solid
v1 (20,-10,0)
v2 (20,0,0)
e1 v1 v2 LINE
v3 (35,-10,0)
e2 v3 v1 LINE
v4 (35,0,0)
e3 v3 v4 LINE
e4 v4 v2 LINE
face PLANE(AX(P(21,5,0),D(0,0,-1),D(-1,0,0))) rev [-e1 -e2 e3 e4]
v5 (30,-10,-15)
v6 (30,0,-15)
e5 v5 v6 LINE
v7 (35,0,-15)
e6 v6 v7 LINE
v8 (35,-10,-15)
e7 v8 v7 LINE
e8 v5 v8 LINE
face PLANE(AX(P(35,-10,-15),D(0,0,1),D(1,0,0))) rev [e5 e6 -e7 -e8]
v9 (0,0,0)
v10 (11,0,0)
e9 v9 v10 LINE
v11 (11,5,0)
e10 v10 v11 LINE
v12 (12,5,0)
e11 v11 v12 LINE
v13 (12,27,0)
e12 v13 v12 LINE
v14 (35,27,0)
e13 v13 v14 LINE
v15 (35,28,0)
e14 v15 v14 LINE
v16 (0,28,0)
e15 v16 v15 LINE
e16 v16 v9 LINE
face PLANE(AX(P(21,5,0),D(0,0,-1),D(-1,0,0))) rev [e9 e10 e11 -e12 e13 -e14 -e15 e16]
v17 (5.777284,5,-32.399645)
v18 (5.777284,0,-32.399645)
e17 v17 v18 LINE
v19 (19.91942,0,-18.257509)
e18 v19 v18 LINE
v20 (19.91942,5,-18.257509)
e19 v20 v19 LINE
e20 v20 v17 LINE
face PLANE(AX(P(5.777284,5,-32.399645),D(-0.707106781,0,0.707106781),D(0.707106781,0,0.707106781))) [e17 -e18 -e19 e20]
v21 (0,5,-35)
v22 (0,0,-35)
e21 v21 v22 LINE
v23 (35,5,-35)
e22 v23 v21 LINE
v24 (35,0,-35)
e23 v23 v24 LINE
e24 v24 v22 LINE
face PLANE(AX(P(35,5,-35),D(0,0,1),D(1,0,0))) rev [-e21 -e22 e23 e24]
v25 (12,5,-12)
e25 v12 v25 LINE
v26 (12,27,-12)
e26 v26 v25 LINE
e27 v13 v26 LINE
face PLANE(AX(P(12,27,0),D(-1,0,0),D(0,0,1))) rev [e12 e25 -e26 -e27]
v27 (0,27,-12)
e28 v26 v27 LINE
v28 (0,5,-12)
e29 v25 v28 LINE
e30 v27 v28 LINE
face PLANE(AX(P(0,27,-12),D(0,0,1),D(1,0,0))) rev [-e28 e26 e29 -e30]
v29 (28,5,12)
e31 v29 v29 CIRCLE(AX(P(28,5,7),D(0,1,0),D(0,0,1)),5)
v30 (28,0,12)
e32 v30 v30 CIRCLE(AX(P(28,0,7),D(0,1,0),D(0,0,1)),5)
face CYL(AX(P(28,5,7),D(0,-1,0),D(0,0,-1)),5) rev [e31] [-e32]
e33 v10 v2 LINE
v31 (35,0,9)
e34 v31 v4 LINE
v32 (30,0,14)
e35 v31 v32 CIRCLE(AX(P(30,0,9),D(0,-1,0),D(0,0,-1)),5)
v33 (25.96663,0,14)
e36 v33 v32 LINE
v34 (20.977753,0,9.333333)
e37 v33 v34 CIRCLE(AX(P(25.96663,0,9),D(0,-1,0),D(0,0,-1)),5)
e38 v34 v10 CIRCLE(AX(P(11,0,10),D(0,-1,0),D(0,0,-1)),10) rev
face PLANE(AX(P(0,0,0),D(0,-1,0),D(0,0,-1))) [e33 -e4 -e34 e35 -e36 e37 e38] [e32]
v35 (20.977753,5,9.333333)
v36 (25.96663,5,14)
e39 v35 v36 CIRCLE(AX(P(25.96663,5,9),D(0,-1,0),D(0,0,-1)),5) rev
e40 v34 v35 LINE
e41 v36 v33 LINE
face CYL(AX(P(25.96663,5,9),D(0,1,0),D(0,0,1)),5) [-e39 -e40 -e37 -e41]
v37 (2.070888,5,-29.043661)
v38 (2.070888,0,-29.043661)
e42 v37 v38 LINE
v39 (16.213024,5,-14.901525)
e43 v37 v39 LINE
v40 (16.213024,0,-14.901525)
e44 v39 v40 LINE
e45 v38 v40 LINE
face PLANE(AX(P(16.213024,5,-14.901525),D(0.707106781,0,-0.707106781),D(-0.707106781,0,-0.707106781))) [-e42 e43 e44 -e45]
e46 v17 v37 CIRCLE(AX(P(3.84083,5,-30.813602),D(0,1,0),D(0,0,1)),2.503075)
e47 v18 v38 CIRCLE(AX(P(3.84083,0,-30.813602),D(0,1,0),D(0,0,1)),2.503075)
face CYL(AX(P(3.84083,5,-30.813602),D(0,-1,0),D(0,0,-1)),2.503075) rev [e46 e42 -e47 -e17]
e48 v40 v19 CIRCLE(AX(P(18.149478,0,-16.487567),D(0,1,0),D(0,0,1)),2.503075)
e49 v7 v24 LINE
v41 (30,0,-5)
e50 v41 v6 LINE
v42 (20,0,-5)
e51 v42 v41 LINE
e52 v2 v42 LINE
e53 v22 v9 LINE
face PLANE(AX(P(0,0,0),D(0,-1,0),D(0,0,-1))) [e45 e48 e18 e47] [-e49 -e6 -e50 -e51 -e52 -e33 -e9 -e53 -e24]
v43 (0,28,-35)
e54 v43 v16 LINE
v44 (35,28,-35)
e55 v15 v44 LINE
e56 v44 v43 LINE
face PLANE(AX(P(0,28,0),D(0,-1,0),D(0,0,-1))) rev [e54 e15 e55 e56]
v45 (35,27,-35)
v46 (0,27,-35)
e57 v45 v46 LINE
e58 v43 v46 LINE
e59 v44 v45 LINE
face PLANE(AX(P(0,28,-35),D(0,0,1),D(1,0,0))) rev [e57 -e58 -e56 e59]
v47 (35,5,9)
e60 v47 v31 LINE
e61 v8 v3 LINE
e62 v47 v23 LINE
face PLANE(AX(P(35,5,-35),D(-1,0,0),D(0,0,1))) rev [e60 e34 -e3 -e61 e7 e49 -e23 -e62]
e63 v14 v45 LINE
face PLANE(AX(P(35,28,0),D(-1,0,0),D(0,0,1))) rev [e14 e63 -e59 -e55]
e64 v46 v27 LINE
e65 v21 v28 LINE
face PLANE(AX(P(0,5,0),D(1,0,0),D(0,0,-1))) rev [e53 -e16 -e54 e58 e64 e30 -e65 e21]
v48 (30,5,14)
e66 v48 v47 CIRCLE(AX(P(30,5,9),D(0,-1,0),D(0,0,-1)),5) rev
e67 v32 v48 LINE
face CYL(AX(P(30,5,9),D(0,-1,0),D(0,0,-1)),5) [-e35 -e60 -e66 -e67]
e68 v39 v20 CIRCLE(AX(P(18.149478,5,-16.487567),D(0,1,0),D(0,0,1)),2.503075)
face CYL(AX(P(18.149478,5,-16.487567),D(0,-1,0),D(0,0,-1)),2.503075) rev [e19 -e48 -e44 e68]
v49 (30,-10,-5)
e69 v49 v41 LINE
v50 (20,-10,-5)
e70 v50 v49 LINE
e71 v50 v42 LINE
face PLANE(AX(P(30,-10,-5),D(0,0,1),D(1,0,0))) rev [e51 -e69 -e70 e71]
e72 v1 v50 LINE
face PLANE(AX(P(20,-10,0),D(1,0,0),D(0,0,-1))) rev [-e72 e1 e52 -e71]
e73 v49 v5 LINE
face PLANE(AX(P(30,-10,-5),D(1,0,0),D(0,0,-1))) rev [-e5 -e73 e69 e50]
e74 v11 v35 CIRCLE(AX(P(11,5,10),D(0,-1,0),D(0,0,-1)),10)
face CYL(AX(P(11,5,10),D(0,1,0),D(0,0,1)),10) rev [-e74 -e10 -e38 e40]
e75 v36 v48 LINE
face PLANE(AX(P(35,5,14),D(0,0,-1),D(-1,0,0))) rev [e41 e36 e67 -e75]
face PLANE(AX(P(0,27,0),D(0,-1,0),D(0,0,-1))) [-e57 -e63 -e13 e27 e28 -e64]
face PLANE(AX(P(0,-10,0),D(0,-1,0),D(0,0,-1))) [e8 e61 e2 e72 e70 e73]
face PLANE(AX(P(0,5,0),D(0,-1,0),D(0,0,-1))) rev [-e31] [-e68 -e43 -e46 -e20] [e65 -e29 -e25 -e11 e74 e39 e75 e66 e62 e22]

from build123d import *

# Parameters (mm, degrees)
SKETCH1_R           = 5
BOSS_EXTRUDE1_DEPTH = 5
BOSS_EXTRUDE2_DEPTH = 10
SKETCH3_W           = 12
SKETCH3_H           = 12
BOSS_EXTRUDE3_DEPTH = 22
SKETCH4_W           = 35
SKETCH4_H           = 35
BOSS_EXTRUDE4_DEPTH = 1
FILLET1_R           = 10
FILLET4_R           = 5


with BuildPart() as part:
    # Sketch1 → Boss-Extrude1 (new body)
    with BuildSketch(Plane(origin=(0, 0, 0), x_dir=(1, 0, 0), z_dir=(0, 1, 0))):
        Polygon((0, 0), (0, 35), (35, 35), (35, 0), (35, -14), (21, -14), (21, 0), align=None)
        with Locations(Location((28, -7, 0), (0, 0, 270))):
            Circle(SKETCH1_R, mode=Mode.SUBTRACT)
        with BuildLine():
            Line((5.77728435, 32.399644503), (19.919419974, 18.257508879))
            ThreePointArc((19.919419974, 18.257508879), (19.829534471, 14.632089471), (16.21302376, 14.901525103))
            Line((16.21302376, 14.901525103), (2.070888136, 29.043660727))
            ThreePointArc((2.070888136, 29.043660727), (2.160773638, 32.669080135), (5.77728435, 32.399644503))
        make_face(mode=Mode.SUBTRACT)
    extrude(amount=BOSS_EXTRUDE1_DEPTH)

    # Sketch2 → Boss-Extrude2 (add)
    with BuildSketch(Plane.XZ):
        Polygon((30, -5), (20, -5), (20, 0), (35, 0), (35, -15), (30, -15), align=None)
    extrude(amount=BOSS_EXTRUDE2_DEPTH)

    # Sketch3 → Boss-Extrude3 (add)
    with BuildSketch(Plane(origin=(0, 5, 0), x_dir=(1, 0, 0), z_dir=(0, 1, 0))):
        with Locations((6, 6)):
            Rectangle(SKETCH3_W, SKETCH3_H)
    extrude(amount=BOSS_EXTRUDE3_DEPTH)

    # Sketch4 → Boss-Extrude4 (add)
    with BuildSketch(Plane(origin=(0, 27, 0), x_dir=(1, 0, 0), z_dir=(0, 1, 0))):
        with Locations((17.5, 17.5)):
            Rectangle(SKETCH4_W, SKETCH4_H)
    extrude(amount=BOSS_EXTRUDE4_DEPTH)

    # Fillet1
    # the kernel refuses this fillet: 10 mm, written as the material it adds along each edge
    with BuildSketch(Plane(origin=(21, 0, 0), x_dir=(0, 0, 1), z_dir=(0, 1, 0))) as fillet1_piece_1:
        with BuildLine():
            CenterArc((FILLET1_R, -FILLET1_R), FILLET1_R, 90, 90)
            Line((0, -FILLET1_R), (0, 0))
            Line((0, 0), (FILLET1_R, 0))
        make_face()
    extrude(amount=5)

    # Fillet4
    fillet4_edges = [part.edges().sort_by_distance(p)[0] for p in [
        (35, 2.5, 14),
        (21, 2.5, 14),
    ]]
    fillet(fillet4_edges, radius=FILLET4_R)


solid = part.part
